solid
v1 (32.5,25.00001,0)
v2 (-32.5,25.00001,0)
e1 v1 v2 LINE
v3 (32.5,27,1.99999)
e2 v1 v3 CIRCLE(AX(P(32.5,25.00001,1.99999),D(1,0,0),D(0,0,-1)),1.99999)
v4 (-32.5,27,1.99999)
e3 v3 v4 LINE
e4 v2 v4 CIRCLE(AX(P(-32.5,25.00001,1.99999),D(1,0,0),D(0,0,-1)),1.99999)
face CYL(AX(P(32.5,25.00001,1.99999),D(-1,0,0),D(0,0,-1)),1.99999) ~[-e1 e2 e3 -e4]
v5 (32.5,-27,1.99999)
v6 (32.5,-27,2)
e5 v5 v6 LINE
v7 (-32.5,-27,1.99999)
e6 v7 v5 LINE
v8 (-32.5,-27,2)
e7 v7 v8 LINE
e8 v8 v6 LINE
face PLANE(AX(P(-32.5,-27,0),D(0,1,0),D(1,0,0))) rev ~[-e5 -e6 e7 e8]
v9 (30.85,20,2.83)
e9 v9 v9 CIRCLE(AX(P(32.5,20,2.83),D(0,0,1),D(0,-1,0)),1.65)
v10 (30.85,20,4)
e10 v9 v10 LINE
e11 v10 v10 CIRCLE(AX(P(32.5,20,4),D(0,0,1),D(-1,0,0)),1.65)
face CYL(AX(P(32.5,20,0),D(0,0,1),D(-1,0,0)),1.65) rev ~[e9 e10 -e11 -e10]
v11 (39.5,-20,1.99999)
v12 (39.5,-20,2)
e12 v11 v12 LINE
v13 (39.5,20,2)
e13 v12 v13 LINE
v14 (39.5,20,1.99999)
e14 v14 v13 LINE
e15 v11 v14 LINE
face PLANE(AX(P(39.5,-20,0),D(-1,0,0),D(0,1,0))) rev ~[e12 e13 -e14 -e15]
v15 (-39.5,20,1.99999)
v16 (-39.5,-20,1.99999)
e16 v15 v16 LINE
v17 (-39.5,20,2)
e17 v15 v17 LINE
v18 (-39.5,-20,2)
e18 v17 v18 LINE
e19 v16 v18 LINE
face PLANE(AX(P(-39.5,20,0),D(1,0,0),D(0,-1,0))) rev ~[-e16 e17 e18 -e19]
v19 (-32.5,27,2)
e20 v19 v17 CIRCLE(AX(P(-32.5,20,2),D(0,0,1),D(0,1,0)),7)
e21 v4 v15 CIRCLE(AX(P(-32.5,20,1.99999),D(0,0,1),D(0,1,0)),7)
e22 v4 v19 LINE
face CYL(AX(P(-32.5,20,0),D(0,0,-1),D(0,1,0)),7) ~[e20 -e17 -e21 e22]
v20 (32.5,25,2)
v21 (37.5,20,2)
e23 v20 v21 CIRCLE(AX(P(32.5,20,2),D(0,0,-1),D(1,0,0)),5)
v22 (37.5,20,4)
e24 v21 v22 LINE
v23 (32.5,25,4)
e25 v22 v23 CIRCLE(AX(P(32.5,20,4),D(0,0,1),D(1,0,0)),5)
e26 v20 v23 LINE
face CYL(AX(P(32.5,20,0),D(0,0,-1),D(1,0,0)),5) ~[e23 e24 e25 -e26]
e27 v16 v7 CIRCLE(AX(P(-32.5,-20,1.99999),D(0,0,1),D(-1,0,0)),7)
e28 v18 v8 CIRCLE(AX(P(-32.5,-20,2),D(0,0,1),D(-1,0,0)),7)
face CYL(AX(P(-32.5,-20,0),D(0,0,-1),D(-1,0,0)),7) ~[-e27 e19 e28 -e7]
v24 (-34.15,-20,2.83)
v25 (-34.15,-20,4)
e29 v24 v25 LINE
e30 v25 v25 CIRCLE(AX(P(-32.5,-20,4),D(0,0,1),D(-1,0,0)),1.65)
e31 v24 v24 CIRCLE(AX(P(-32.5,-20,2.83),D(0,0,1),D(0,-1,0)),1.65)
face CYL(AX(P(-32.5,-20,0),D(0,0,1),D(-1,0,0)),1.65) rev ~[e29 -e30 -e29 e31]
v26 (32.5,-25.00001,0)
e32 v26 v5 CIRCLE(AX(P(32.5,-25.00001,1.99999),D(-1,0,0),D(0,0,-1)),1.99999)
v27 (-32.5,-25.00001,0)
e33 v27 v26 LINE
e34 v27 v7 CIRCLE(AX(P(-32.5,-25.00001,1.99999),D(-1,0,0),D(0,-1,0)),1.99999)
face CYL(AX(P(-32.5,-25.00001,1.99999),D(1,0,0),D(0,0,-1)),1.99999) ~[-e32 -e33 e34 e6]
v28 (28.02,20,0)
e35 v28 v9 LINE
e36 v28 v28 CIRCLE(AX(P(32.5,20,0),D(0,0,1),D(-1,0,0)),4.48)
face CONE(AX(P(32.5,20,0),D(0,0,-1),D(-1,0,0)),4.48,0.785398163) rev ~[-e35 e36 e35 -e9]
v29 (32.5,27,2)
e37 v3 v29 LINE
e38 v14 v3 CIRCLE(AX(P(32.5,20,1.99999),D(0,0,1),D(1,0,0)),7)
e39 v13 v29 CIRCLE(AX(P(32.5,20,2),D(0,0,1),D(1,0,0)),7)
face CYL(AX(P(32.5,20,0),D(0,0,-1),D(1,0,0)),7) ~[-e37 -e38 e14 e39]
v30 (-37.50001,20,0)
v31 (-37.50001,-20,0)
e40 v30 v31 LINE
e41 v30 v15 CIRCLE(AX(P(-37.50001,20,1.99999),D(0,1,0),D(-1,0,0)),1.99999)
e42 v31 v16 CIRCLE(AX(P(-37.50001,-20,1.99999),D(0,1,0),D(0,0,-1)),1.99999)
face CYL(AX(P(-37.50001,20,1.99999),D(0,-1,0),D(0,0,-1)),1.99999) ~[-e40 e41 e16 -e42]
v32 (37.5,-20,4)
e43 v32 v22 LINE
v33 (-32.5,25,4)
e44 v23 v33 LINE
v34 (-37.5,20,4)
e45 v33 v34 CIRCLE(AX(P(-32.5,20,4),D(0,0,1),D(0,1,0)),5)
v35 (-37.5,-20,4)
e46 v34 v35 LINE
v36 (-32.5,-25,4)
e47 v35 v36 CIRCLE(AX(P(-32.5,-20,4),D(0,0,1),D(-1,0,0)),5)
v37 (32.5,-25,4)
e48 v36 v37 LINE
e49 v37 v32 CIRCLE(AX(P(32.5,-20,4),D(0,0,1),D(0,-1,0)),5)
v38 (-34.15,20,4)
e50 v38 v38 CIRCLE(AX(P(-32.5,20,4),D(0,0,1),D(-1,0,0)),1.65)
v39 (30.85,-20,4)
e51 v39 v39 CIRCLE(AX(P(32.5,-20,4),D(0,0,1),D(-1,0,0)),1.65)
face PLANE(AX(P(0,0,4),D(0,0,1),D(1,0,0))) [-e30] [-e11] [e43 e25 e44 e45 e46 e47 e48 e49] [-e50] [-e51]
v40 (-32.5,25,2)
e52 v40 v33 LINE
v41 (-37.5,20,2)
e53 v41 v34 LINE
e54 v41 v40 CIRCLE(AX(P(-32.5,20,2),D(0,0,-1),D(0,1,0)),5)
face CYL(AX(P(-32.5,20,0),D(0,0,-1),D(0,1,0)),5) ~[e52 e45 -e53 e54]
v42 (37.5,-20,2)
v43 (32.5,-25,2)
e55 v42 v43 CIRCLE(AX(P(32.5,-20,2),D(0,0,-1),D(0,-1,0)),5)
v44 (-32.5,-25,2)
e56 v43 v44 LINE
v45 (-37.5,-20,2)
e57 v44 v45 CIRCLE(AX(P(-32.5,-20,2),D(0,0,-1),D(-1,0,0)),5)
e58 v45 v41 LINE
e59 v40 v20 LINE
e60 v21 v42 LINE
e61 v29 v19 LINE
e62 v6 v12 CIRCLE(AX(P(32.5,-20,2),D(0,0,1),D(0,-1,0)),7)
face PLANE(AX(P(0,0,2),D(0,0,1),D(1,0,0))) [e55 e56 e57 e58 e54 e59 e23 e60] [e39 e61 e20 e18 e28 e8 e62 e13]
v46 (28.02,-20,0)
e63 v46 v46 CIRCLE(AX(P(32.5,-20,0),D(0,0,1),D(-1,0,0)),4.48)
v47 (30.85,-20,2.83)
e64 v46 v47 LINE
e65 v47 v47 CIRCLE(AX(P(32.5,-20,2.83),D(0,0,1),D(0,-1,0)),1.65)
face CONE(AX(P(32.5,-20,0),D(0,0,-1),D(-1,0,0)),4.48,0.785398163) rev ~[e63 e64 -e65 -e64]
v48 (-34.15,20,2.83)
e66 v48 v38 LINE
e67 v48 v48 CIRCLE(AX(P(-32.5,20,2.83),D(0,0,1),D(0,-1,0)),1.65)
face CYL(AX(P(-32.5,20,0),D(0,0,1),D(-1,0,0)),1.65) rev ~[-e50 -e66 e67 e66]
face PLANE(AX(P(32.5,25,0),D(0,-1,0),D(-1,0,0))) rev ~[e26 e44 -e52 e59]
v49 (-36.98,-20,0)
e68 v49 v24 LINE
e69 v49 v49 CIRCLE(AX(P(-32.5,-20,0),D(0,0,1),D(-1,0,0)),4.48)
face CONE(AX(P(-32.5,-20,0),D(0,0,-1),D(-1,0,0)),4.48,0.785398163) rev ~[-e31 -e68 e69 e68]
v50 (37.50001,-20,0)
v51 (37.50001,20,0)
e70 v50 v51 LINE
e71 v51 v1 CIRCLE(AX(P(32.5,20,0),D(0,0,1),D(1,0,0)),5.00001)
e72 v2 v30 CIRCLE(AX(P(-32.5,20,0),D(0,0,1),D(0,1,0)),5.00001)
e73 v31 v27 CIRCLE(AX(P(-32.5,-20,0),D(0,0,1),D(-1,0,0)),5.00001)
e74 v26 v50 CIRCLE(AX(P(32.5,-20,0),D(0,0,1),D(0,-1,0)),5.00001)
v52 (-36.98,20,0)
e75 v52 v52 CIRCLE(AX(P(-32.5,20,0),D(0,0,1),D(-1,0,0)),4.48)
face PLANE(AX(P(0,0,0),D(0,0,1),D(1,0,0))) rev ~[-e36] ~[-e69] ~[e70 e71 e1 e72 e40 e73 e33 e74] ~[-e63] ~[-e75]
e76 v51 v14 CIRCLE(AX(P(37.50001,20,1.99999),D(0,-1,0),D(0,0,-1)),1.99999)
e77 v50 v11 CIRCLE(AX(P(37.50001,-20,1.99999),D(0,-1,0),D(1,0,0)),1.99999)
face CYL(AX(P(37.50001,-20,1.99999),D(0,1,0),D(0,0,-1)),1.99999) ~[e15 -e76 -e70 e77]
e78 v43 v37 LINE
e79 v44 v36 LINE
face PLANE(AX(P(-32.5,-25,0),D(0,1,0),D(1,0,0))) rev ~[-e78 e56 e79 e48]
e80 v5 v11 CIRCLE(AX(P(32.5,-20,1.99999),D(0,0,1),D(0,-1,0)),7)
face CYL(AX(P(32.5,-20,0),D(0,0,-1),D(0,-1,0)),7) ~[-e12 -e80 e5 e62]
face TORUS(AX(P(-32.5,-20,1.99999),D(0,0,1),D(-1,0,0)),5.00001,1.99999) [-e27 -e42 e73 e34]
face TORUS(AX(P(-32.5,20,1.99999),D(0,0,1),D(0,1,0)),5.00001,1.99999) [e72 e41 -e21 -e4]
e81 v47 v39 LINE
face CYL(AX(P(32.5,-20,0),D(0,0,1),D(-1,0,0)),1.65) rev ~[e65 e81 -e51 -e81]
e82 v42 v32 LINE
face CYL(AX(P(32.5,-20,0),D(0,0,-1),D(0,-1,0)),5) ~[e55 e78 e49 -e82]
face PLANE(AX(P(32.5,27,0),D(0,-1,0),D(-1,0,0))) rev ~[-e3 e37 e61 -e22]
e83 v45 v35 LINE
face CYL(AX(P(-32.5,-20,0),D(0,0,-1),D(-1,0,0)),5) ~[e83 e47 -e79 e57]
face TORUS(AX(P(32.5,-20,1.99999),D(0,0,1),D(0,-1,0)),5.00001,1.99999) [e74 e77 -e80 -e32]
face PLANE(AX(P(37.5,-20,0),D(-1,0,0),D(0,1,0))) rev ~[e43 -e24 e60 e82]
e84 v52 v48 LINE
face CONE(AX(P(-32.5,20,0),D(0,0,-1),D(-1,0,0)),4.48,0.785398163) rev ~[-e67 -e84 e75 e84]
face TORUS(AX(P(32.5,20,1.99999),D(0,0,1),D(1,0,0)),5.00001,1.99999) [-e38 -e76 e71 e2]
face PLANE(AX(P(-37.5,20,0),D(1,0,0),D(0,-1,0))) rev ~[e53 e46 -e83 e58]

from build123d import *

# Parameters (mm, degrees)
F1_DEPTH       = 2
F2_DEPTH       = 4
F3_R           = 1.99999
F4_D           = 3.3
F4_CSINK_D     = 8.96
F4_CSINK_ANGLE = 90


# Not quite as in the source:
# - a fillet or chamfer is up to 0.001 mm smaller than in the source, because OpenCascade refuses the exact size


with BuildPart() as f1:
    # F0 (on Top) → F1 (new body)
    with BuildSketch(Plane.XY):
        with BuildLine():
            Line((32.5, 26.9999996311), (-32.5, 26.9999996311))
            ThreePointArc((-32.5, 26.9999996311), (-37.4497472074, 24.9497472074), (-39.4999996311, 20))
            Line((-39.4999996311, 20), (-39.4999996311, -20))
            ThreePointArc((-39.4999996311, -20), (-37.4497472074, -24.9497472074), (-32.5, -26.9999996311))
            Line((-32.5, -26.9999996311), (32.5, -26.9999996311))
            ThreePointArc((32.5, -26.9999996311), (37.4497472074, -24.9497472074), (39.4999996311, -20))
            Line((39.4999996311, -20), (39.4999996311, 20))
            ThreePointArc((39.4999996311, 20), (37.4497472074, 24.9497472074), (32.5, 26.9999996311))
        make_face()
        with BuildLine():
            ThreePointArc((-37.5, 20), (-36.0355339059, 23.5355339059), (-32.5, 25))
            Line((-32.5, 25), (32.5, 25))
            ThreePointArc((32.5, 25), (36.0355339059, 23.5355339059), (37.5, 20))
            Line((37.5, 20), (37.5, -20))
            ThreePointArc((37.5, -20), (36.0355339059, -23.5355339059), (32.5, -25))
            Line((32.5, -25), (-32.5, -25))
            ThreePointArc((-32.5, -25), (-36.0355339059, -23.5355339059), (-37.5, -20))
            Line((-37.5, -20), (-37.5, 20))
        make_face(mode=Mode.SUBTRACT)
        with BuildLine():
            Line((32.5, 25), (-32.5, 25))
            ThreePointArc((-32.5, 25), (-36.0355339059, 23.5355339059), (-37.5, 20))
            Line((-37.5, 20), (-37.5, -20))
            ThreePointArc((-37.5, -20), (-36.0355339059, -23.5355339059), (-32.5, -25))
            Line((-32.5, -25), (32.5, -25))
            ThreePointArc((32.5, -25), (36.0355339059, -23.5355339059), (37.5, -20))
            Line((37.5, -20), (37.5, 20))
            ThreePointArc((37.5, 20), (36.0355339059, 23.5355339059), (32.5, 25))
        make_face()
    extrude(amount=F1_DEPTH)

    # F0 (on Top) → F2 (join)
    with BuildSketch(Plane.XY):
        with BuildLine():
            Line((32.5, 25), (-32.5, 25))
            ThreePointArc((-32.5, 25), (-36.0355339059, 23.5355339059), (-37.5, 20))
            Line((-37.5, 20), (-37.5, -20))
            ThreePointArc((-37.5, -20), (-36.0355339059, -23.5355339059), (-32.5, -25))
            Line((-32.5, -25), (32.5, -25))
            ThreePointArc((32.5, -25), (36.0355339059, -23.5355339059), (37.5, -20))
            Line((37.5, -20), (37.5, 20))
            ThreePointArc((37.5, 20), (36.0355339059, 23.5355339059), (32.5, 25))
        make_face()
    extrude(amount=F2_DEPTH)

    # F3 (radius 2 in the source; OpenCascade refuses exactly that, so slightly less here)
    f3_edges = [f1.edges().sort_by_distance(p)[0] for p in [
        (0, 27, 0),
        (-37.449747, 24.949747, 0),
        (-39.5, 0, 0),
        (-37.449747, -24.949747, 0),
        (0, -27, 0),
        (37.449747, -24.949747, 0),
        (39.5, 0, 0),
        (37.449747, 24.949747, 0),
    ]]
    fillet(f3_edges, radius=F3_R)

    # F4 (through all)
    with Locations(Plane(origin=(0, 0, 0), x_dir=(1, 0, 0), z_dir=(0, 0, -1))):
        with Locations((32.5, 20), (32.5, -20), (-32.5, -20), (-32.5, 20)):
            CounterSinkHole(F4_D / 2, F4_CSINK_D / 2, counter_sink_angle=F4_CSINK_ANGLE)


solid = f1.part
